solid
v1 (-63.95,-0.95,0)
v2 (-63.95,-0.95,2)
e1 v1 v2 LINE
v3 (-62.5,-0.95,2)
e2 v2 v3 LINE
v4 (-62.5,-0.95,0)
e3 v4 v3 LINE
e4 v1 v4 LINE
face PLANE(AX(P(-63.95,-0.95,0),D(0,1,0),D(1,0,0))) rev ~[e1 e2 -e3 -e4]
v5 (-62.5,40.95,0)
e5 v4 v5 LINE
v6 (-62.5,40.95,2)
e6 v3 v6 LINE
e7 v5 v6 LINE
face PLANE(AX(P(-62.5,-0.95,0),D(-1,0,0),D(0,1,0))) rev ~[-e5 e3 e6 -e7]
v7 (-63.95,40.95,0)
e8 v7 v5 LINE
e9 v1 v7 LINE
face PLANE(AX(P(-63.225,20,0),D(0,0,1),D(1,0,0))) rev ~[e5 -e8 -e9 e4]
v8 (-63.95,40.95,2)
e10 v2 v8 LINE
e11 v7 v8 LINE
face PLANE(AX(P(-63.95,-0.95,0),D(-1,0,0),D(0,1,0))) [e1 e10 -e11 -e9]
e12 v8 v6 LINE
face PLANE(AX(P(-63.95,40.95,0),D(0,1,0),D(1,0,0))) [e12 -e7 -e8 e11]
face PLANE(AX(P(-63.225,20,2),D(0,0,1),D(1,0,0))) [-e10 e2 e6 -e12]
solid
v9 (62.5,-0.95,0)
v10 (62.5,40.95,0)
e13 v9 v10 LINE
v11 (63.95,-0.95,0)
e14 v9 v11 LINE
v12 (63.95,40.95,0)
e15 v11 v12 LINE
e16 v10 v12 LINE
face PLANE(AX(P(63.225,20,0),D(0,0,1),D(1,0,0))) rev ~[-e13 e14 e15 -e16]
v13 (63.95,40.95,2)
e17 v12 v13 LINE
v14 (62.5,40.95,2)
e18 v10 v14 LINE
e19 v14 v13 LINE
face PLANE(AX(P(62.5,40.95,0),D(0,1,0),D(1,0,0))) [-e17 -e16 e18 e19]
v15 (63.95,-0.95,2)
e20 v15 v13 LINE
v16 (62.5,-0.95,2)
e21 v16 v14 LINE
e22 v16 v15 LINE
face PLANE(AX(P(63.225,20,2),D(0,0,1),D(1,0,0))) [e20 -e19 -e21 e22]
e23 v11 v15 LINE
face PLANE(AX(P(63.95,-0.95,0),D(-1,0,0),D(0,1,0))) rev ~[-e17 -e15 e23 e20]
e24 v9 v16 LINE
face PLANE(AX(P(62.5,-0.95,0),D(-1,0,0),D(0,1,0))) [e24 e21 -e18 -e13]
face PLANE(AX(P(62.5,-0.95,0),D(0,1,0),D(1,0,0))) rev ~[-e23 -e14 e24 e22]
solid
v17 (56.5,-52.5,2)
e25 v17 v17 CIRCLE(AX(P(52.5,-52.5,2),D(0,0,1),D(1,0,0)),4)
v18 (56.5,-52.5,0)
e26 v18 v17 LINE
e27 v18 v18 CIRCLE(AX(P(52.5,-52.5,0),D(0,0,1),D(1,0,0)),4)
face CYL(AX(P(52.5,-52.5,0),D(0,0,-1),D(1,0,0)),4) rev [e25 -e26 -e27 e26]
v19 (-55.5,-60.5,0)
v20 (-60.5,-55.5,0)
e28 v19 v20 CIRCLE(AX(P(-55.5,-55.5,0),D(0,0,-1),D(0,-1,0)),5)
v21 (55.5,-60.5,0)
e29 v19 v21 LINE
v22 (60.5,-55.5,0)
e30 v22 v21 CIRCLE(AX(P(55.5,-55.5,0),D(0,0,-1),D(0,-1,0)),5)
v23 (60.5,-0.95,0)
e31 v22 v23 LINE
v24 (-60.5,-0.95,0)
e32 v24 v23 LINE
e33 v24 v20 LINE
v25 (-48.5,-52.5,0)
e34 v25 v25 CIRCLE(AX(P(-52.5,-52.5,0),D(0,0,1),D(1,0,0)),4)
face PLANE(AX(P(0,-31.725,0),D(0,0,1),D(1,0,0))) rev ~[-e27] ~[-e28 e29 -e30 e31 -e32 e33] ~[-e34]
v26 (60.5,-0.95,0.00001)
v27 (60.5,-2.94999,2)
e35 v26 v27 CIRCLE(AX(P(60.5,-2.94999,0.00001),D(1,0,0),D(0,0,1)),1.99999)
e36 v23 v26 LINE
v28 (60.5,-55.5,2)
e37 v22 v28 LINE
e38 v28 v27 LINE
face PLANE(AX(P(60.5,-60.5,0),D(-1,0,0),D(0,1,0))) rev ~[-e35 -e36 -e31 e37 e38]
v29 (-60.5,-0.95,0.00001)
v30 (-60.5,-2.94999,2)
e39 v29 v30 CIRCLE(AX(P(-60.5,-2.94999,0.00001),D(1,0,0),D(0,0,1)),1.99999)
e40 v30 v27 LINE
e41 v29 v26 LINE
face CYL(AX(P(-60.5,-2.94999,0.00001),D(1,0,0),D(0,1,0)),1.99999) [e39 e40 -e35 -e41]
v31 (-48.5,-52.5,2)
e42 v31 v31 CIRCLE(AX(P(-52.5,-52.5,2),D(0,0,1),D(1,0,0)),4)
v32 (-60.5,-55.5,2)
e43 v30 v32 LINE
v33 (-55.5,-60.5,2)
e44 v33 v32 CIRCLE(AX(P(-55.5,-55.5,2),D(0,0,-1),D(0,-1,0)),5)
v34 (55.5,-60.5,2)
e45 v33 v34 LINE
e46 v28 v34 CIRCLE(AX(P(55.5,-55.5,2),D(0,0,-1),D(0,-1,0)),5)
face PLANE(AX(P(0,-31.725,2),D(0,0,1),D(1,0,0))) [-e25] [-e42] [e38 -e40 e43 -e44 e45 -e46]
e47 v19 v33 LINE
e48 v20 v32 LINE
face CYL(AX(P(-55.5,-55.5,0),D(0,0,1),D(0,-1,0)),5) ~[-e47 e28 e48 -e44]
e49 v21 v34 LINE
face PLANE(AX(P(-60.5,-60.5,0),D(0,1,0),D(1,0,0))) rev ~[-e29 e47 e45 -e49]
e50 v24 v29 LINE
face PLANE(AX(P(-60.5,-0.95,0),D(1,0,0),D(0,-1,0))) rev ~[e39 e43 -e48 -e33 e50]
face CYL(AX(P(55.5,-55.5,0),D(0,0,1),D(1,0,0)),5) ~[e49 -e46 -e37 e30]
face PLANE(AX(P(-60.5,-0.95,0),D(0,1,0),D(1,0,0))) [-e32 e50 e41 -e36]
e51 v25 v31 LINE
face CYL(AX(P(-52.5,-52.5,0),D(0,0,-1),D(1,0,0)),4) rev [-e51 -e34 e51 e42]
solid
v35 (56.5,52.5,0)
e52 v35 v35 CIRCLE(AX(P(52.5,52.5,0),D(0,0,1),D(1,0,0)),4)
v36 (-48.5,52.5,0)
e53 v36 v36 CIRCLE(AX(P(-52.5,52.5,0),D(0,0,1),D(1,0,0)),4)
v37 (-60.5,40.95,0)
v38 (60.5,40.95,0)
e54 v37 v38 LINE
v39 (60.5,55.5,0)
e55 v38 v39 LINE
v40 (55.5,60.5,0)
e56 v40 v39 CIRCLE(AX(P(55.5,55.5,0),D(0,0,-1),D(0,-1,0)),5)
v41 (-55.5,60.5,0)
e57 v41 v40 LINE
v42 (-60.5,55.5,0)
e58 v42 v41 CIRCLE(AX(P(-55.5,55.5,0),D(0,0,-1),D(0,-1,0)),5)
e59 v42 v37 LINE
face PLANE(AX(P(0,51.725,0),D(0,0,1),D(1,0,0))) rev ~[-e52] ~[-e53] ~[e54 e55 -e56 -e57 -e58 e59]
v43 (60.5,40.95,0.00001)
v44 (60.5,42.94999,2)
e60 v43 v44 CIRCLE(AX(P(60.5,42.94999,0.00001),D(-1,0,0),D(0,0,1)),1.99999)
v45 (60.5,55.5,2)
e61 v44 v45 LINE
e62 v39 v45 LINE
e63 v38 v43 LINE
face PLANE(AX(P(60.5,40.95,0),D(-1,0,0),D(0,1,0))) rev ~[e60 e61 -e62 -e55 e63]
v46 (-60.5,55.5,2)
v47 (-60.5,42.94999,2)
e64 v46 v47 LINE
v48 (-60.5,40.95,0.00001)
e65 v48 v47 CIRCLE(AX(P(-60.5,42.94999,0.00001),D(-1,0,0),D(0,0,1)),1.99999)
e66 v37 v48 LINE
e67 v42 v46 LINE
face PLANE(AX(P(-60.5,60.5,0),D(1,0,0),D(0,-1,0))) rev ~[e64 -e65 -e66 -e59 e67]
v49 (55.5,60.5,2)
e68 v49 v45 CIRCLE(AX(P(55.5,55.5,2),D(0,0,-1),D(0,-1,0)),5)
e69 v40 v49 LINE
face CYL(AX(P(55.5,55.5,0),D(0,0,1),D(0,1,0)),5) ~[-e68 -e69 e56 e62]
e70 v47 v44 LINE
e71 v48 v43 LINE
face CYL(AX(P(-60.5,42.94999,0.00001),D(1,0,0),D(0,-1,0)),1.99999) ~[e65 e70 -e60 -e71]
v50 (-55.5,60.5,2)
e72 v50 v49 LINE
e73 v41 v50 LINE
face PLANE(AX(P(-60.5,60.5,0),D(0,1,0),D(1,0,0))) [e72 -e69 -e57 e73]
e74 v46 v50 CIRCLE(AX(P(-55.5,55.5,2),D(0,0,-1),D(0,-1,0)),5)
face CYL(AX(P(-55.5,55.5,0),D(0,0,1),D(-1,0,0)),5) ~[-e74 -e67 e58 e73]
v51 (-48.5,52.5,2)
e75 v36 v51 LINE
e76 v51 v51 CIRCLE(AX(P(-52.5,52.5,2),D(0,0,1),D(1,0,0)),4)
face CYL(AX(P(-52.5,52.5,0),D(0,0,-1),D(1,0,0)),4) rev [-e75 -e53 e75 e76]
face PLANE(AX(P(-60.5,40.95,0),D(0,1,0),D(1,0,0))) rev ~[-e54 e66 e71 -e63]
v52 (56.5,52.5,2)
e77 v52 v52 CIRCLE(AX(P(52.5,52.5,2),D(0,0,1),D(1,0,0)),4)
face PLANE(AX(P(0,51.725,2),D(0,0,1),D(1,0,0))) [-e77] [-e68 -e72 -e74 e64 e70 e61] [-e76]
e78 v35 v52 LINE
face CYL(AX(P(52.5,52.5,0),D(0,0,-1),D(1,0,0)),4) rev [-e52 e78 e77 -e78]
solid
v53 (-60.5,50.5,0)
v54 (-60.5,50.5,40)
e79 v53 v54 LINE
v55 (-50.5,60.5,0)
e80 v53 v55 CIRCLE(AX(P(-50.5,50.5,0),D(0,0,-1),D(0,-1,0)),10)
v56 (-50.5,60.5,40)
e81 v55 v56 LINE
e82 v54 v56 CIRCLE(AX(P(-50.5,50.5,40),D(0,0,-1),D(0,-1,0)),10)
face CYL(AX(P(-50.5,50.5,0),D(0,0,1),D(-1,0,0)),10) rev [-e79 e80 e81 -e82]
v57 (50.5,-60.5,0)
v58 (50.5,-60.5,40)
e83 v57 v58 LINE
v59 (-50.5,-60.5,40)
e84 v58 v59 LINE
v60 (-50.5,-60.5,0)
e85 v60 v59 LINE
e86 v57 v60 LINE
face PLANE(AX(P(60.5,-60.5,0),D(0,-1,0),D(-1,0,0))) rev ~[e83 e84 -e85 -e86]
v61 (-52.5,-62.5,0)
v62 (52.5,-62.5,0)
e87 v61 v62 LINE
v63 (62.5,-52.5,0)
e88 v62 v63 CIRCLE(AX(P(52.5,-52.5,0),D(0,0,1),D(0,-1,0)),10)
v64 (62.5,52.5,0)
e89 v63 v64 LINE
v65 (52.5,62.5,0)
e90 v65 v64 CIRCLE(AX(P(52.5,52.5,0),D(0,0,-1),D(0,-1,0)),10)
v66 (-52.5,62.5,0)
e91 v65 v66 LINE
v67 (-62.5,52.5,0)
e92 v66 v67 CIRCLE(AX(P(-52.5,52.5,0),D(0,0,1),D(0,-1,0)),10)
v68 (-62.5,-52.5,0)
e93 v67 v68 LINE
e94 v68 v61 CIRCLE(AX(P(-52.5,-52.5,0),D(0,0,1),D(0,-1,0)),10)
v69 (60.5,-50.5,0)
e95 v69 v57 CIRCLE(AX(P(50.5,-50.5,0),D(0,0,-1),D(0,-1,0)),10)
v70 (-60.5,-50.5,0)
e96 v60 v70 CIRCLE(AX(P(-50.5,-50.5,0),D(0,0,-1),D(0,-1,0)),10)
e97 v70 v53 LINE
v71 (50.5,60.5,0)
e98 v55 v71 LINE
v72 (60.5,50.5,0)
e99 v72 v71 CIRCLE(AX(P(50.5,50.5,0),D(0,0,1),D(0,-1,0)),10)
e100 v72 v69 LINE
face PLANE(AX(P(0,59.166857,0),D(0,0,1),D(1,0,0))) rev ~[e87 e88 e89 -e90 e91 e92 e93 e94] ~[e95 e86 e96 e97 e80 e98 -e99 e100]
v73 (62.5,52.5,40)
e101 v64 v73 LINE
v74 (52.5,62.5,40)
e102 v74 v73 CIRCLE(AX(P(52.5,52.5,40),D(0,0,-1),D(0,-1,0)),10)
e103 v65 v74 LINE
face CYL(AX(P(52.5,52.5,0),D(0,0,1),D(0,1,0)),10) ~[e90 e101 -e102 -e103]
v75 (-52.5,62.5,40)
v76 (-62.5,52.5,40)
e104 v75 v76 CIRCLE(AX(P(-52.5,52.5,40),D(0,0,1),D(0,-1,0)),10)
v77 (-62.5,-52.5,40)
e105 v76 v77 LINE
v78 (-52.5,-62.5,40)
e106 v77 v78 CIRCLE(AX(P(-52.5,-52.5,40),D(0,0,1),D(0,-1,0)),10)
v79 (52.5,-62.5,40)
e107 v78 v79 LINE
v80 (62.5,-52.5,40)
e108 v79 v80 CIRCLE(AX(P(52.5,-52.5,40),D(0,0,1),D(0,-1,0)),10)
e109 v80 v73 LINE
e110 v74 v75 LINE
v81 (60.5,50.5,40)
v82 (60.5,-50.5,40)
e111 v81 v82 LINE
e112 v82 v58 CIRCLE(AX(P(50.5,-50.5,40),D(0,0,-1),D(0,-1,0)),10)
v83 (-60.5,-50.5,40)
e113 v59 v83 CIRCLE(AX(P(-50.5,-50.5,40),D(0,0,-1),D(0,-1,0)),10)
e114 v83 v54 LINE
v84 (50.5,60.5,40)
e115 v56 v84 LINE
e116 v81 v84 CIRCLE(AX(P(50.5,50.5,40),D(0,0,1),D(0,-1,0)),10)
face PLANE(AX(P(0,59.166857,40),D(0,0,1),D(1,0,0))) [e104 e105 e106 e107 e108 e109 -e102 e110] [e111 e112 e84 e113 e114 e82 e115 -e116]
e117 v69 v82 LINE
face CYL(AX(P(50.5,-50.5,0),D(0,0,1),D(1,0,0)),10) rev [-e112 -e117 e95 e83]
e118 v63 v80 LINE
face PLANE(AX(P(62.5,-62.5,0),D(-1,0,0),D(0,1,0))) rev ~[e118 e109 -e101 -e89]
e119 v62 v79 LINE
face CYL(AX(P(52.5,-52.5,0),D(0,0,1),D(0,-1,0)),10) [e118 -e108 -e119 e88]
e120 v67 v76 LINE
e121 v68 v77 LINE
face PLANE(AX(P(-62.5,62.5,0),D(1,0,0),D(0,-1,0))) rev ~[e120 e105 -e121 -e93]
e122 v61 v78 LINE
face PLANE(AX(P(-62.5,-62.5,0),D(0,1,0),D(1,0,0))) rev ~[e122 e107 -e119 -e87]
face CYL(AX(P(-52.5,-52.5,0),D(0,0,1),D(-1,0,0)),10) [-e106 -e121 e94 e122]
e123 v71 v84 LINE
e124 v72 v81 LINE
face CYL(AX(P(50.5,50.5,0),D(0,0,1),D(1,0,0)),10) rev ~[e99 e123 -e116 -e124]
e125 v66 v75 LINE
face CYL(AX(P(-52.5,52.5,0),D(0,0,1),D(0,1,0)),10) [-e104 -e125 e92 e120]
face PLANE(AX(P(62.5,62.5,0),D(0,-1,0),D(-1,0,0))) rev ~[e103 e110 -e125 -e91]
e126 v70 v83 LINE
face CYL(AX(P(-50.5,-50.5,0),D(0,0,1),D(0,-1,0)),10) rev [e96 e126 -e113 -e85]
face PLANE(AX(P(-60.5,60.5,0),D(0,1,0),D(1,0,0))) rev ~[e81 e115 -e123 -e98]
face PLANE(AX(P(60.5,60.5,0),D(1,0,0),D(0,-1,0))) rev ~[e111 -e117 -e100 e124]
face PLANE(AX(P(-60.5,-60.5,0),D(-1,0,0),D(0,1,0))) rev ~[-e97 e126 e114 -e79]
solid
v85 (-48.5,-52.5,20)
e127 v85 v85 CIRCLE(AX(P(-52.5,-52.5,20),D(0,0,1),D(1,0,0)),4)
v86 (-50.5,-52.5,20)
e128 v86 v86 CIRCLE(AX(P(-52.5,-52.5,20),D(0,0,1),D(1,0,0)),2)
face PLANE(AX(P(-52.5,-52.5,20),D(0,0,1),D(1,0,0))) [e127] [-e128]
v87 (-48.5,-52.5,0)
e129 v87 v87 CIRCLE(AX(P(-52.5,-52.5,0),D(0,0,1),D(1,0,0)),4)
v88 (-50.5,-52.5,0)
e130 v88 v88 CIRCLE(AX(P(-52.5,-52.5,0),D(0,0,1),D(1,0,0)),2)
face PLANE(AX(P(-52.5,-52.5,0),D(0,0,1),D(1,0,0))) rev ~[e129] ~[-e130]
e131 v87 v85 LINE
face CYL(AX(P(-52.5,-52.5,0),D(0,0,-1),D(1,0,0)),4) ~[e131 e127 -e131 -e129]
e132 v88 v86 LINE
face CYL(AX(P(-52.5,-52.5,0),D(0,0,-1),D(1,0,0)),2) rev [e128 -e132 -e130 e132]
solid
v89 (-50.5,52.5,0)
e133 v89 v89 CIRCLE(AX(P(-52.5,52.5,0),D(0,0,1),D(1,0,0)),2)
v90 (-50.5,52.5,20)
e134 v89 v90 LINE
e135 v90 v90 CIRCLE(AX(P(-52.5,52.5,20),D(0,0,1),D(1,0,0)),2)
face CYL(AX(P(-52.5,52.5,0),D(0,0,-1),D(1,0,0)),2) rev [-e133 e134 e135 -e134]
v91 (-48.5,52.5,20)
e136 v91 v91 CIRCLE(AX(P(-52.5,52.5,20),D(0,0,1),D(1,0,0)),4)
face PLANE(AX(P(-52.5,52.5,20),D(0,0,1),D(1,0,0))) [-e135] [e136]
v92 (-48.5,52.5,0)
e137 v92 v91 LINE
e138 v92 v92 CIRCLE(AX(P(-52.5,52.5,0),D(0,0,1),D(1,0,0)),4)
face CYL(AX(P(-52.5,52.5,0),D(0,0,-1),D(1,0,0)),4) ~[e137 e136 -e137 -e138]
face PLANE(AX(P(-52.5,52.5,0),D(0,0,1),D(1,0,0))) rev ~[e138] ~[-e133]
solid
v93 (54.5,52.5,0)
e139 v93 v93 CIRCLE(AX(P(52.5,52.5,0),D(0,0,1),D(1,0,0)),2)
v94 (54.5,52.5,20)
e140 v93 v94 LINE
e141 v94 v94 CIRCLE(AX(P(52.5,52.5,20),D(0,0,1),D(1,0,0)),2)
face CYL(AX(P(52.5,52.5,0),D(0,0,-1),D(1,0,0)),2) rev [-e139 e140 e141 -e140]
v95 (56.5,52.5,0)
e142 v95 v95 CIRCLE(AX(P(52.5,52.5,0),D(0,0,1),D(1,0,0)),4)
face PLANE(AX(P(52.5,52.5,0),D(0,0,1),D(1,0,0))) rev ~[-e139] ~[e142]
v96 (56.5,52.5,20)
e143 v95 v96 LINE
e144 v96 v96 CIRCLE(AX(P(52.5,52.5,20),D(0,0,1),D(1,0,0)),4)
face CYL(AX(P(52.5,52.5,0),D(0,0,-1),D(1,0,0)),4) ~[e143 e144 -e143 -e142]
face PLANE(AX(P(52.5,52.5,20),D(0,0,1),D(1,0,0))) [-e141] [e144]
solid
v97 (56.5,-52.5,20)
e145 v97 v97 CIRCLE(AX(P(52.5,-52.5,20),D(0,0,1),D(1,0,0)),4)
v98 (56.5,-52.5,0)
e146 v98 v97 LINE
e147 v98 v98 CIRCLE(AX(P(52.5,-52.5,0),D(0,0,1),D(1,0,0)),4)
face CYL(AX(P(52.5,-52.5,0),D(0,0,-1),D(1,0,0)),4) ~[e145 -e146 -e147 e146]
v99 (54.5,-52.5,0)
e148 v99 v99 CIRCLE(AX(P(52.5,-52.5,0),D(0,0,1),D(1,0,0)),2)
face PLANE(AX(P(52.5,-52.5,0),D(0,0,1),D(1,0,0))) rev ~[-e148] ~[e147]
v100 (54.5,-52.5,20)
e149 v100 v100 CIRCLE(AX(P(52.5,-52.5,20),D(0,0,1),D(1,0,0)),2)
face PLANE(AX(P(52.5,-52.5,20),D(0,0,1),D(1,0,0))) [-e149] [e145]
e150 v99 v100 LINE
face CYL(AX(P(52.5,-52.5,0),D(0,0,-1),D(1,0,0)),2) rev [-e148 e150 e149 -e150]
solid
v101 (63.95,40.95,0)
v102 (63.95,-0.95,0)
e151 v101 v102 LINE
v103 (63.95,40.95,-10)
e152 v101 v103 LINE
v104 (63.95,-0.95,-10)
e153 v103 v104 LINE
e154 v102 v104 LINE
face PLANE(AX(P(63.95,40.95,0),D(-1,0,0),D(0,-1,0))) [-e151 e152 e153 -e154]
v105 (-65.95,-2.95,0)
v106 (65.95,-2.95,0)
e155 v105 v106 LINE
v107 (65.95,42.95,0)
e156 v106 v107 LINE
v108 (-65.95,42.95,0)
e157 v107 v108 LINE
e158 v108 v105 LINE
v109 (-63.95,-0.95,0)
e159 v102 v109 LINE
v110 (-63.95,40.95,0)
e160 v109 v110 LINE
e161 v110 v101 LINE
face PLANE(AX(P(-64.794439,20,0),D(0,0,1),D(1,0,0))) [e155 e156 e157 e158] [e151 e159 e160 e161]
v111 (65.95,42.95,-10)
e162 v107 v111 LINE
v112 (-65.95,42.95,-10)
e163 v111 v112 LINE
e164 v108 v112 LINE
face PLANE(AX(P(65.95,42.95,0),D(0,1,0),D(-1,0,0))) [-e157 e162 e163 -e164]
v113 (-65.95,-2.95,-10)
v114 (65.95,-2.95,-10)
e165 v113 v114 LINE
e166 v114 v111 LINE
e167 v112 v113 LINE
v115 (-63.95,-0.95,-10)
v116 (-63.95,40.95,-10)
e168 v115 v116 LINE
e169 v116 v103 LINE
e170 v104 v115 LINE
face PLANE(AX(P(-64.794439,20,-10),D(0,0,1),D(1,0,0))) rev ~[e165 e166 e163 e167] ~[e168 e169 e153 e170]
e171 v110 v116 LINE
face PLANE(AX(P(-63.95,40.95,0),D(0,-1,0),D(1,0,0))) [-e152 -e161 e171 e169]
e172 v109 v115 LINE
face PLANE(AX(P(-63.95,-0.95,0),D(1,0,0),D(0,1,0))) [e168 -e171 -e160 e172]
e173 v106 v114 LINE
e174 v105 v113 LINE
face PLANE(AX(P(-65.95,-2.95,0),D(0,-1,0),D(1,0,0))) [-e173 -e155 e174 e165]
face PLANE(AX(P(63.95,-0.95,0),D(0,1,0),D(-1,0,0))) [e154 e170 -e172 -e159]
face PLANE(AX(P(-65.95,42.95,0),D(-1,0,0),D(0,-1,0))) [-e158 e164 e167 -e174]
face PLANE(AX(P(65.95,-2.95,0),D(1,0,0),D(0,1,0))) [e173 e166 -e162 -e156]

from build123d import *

# Parameters (mm, degrees)
F0_W     = 121
F0_H     = 17.55
F0_R     = 4
F0_H_2   = 2
F1_DEPTH = 2
F0_H_3   = 57.55
F0_W_2   = 1.45
F0_H_4   = 41.9
F0_W_3   = 2
F2_DEPTH = 40
F0_R_2   = 2
F3_DEPTH = 20
F4_DEPTH = 10
F5_R     = 10
F6_R     = 1.99999
F6_2_R   = 1.99999
F7_R     = 5
F7_2_R   = 5


# Not quite as in the source:
# - a fillet or chamfer is up to 0.001 mm smaller than in the source, because OpenCascade refuses the exact size


with BuildPart() as f1:
    # F0 (on Top) → F1 (new body)
    with BuildSketch(Plane.XY):
        with Locations((0, 51.725)):
            Rectangle(F0_W, F0_H)
        with Locations((-52.5, 52.5)):
            Circle(F0_R, mode=Mode.SUBTRACT)
        with Locations((52.5, 52.5)):
            Circle(F0_R, mode=Mode.SUBTRACT)
        with Locations((0, 41.95)):
            Rectangle(F0_W, F0_H_2)
    extrude(amount=F1_DEPTH)

    # F6#2 (radius 2 in the source; OpenCascade refuses exactly that, so slightly less here)
    f6_2_edges = [f1.edges().sort_by_distance(p)[0] for p in [
        (0, 40.95, 2),
    ]]
    fillet(f6_2_edges, radius=F6_2_R)

    # F7
    f7_edges = [f1.edges().sort_by_distance(p)[0] for p in [
        (60.5, 60.5, 1),
        (-60.5, 60.5, 1),
    ]]
    fillet(f7_edges, radius=F7_R)


with BuildPart() as f1b:
    # F0 (on Top) → F1, piece 2 (new body)
    with BuildSketch(Plane.XY):
        with Locations((0, -31.725)):
            Rectangle(F0_W, F0_H_3)
        with Locations((-52.5, -52.5)):
            Circle(F0_R, mode=Mode.SUBTRACT)
        with Locations((52.5, -52.5)):
            Circle(F0_R, mode=Mode.SUBTRACT)
        with Locations((0, -1.95)):
            Rectangle(F0_W, F0_H_2)
    extrude(amount=F1_DEPTH)

    # F6 (radius 2 in the source; OpenCascade refuses exactly that, so slightly less here)
    f6_edges = [f1b.edges().sort_by_distance(p)[0] for p in [
        (0, -0.95, 2),
    ]]
    fillet(f6_edges, radius=F6_R)

    # F7#2
    f7_2_edges = [f1b.edges().sort_by_distance(p)[0] for p in [
        (-60.5, -60.5, 1),
        (60.5, -60.5, 1),
    ]]
    fillet(f7_2_edges, radius=F7_2_R)


with BuildPart() as f1c:
    # F0 (on Top) → F1, piece 3 (new body)
    with BuildSketch(Plane.XY):
        with Locations((-63.225, 20)):
            Rectangle(F0_W_2, F0_H_4)
    extrude(amount=F1_DEPTH)


with BuildPart() as f1d:
    # F0 (on Top) → F1, piece 4 (new body)
    with BuildSketch(Plane.XY):
        with Locations((63.225, 20)):
            Rectangle(F0_W_2, F0_H_4)
    extrude(amount=F1_DEPTH)


with BuildPart() as f2:
    # F0 (on Top) → F2 (new body)
    with BuildSketch(Plane.XY):
        Polygon((60.5, 60.5), (60.5, 42.95), (62.5, 42.95), (62.5, 62.5), (-62.5, 62.5), (-62.5, 42.95), (-60.5, 42.95), (-60.5, 60.5), align=None)
        with Locations((-61.5, 41.95)):
            Rectangle(F0_W_3, F0_H_2)
        with Locations((-61.5, 20)):
            Rectangle(F0_W_3, F0_H_4)
        Polygon((60.5, -2.95), (60.5, -60.5), (-60.5, -60.5), (-60.5, -2.95), (-62.5, -2.95), (-62.5, -62.5), (62.5, -62.5), (62.5, -2.95), align=None)
        with Locations((-61.5, -1.95)):
            Rectangle(F0_W_3, F0_H_2)
        with Locations((61.5, -1.95)):
            Rectangle(F0_W_3, F0_H_2)
        with Locations((61.5, 20)):
            Rectangle(F0_W_3, F0_H_4)
        with Locations((61.5, 41.95)):
            Rectangle(F0_W_3, F0_H_2)
    extrude(amount=F2_DEPTH)

    # F5
    f5_edges = [f2.edges().sort_by_distance(p)[0] for p in [
        (-60.5, 60.5, 20),
        (60.5, 60.5, 20),
        (-60.5, -60.5, 20),
        (60.5, -60.5, 20),
        (-62.5, 62.5, 20),
        (62.5, 62.5, 20),
        (62.5, -62.5, 20),
        (-62.5, -62.5, 20),
    ]]
    fillet(f5_edges, radius=F5_R)


with BuildPart() as f3:
    # F0 (on Top) → F3 (new body)
    with BuildSketch(Plane.XY):
        with Locations((-52.5, 52.5)):
            Circle(F0_R)
        with Locations((-52.5, 52.5)):
            Circle(F0_R_2, mode=Mode.SUBTRACT)
    extrude(amount=F3_DEPTH)


with BuildPart() as f3b:
    # F0 (on Top) → F3, piece 2 (new body)
    with BuildSketch(Plane.XY):
        with Locations((52.5, 52.5)):
            Circle(F0_R)
        with Locations((52.5, 52.5)):
            Circle(F0_R_2, mode=Mode.SUBTRACT)
    extrude(amount=F3_DEPTH)


with BuildPart() as f3c:
    # F0 (on Top) → F3, piece 3 (new body)
    with BuildSketch(Plane.XY):
        with Locations((52.5, -52.5)):
            Circle(F0_R)
        with Locations((52.5, -52.5)):
            Circle(F0_R_2, mode=Mode.SUBTRACT)
    extrude(amount=F3_DEPTH)


with BuildPart() as f3d:
    # F0 (on Top) → F3, piece 4 (new body)
    with BuildSketch(Plane.XY):
        with Locations((-52.5, -52.5)):
            Circle(F0_R)
        with Locations((-52.5, -52.5)):
            Circle(F0_R_2, mode=Mode.SUBTRACT)
    extrude(amount=F3_DEPTH)


with BuildPart() as f4:
    # F0 (on Top) → F4 (new body)
    with BuildSketch(Plane.XY):
        Polygon((-65.95, -2.95), (-62.5, -2.95), (-62.5, -0.95), (-63.95, -0.95), (-63.95, 40.95), (-62.5, 40.95), (-62.5, 42.95), (-65.95, 42.95), align=None)
        with Locations((-61.5, -1.95)):
            Rectangle(F0_W_3, F0_H_2)
        with Locations((-61.5, 41.95)):
            Rectangle(F0_W_3, F0_H_2)
        with Locations((0, -1.95)):
            Rectangle(F0_W, F0_H_2)
        with Locations((0, 41.95)):
            Rectangle(F0_W, F0_H_2)
        with Locations((61.5, -1.95)):
            Rectangle(F0_W_3, F0_H_2)
        with Locations((61.5, 41.95)):
            Rectangle(F0_W_3, F0_H_2)
        Polygon((62.5, -0.95), (62.5, -2.95), (65.95, -2.95), (65.95, 42.95), (62.5, 42.95), (62.5, 40.95), (63.95, 40.95), (63.95, -0.95), align=None)
    extrude(amount=-F4_DEPTH)


solid = Compound([f1.part, f1b.part, f1c.part, f1d.part, f2.part, f3.part, f3b.part, f3c.part, f3d.part, f4.part])
